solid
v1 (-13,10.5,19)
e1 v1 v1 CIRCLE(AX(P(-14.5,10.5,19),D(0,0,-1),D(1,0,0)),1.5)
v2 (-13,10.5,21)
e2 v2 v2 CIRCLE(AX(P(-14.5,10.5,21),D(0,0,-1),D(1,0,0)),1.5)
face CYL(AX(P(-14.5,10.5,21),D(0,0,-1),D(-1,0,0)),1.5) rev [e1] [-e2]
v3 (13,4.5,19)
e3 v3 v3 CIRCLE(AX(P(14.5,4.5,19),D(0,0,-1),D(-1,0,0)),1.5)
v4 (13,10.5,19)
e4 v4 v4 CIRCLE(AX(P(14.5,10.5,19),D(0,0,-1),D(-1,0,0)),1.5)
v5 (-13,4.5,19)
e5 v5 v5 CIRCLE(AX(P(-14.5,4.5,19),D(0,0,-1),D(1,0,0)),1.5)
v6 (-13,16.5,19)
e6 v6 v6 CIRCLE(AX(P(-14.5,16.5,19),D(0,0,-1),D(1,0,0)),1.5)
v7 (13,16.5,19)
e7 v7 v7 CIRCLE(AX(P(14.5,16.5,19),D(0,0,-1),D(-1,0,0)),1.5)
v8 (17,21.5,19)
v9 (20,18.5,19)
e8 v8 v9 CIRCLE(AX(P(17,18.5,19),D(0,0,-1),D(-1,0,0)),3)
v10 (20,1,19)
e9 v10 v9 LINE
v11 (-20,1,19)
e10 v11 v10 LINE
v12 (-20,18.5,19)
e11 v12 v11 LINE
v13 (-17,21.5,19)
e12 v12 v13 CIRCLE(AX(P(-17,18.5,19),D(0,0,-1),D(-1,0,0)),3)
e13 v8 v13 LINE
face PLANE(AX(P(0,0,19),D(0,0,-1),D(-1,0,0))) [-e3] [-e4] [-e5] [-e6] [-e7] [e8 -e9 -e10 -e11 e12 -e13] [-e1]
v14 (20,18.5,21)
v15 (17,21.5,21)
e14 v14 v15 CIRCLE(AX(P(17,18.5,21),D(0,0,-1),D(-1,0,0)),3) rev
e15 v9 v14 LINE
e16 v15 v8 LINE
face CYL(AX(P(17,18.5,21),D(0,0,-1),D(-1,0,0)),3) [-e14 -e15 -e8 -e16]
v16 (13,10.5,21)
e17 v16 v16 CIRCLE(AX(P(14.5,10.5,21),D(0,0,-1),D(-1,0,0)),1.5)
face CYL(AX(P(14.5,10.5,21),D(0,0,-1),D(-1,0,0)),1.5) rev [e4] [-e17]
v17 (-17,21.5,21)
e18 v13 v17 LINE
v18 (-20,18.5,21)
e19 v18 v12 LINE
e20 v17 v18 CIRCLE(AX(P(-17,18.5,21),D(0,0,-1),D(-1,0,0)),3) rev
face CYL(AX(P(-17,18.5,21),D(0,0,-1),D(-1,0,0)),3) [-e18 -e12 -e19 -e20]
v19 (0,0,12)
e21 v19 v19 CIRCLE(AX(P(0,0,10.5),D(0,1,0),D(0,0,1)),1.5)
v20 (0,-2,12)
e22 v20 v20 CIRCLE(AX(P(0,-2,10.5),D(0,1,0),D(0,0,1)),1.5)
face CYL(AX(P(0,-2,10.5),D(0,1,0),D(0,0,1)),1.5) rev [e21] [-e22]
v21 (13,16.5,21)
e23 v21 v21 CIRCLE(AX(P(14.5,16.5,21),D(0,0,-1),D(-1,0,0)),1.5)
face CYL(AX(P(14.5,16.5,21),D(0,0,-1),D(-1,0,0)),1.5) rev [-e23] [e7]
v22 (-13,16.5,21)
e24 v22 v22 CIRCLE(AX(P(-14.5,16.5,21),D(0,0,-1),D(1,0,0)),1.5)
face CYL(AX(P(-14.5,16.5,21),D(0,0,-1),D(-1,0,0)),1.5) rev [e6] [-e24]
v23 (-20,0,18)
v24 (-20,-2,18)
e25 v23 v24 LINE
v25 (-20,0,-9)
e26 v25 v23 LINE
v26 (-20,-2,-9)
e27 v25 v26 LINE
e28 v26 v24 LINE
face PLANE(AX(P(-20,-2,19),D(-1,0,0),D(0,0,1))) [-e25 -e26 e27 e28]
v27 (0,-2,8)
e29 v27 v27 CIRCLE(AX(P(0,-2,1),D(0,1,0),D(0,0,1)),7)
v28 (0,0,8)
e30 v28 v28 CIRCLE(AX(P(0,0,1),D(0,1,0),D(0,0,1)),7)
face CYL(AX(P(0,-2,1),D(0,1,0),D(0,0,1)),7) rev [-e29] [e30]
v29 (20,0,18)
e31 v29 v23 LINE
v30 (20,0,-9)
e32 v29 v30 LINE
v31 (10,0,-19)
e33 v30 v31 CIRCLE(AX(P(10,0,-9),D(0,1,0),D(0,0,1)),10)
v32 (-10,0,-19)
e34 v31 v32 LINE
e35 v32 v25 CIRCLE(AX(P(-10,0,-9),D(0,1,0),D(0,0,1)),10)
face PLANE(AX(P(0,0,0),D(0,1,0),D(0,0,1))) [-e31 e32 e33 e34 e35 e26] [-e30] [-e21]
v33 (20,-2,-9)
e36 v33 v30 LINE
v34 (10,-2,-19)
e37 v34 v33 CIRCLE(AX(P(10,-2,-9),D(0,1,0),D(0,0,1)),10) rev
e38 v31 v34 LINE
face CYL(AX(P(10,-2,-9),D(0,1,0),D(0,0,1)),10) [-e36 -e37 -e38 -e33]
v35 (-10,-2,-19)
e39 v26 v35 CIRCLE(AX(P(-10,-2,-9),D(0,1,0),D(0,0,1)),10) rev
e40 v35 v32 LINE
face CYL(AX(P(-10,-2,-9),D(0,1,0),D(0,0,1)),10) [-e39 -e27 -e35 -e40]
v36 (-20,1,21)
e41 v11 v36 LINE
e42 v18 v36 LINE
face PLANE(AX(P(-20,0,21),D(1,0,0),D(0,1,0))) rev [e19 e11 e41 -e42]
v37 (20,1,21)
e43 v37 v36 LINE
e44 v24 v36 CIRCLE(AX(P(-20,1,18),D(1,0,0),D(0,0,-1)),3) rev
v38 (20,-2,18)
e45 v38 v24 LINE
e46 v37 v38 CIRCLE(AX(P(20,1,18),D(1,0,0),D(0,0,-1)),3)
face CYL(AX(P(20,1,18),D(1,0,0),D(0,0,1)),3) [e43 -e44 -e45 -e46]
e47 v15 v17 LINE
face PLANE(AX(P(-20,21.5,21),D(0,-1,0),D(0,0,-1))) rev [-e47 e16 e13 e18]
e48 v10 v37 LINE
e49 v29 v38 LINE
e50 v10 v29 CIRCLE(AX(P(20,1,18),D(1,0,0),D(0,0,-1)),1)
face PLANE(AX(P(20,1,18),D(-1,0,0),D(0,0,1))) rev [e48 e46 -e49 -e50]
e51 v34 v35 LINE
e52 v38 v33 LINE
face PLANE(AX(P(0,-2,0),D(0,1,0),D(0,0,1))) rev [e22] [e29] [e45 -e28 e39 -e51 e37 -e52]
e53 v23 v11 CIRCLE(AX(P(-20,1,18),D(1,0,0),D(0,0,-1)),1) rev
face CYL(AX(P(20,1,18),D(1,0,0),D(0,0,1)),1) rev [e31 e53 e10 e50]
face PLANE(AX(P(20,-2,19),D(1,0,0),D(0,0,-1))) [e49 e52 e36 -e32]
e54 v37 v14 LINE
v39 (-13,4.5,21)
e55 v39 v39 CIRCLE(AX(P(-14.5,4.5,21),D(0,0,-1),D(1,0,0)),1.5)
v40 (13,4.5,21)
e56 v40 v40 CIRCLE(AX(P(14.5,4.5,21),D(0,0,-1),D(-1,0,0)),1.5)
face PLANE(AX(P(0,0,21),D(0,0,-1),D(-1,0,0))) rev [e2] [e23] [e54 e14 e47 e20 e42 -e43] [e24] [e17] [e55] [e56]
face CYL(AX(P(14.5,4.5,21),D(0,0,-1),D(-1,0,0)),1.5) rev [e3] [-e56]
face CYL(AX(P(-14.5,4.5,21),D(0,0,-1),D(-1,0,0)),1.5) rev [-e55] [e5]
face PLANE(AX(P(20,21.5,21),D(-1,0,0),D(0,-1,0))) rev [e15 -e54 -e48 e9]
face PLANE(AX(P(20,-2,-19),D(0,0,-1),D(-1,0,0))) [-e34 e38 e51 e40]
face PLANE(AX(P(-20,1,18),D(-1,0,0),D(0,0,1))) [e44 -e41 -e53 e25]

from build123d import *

# Parameters (mm, degrees)
SKETCH1_W                    = 40
SKETCH1_H                    = 38
SKETCH1_R                    = 7
SKETCH1_R_2                  = 1.5
BASE_FLANGE1_DEPTH           = 2
EDGE_FLANGE1_STRIP_W         = 10
EDGE_FLANGE1_STRIP_H         = 2
EDGE_FLANGE1_STRIP_CUT_DEPTH = 40
EDGE_FLANGE1_DEPTH           = 40
FILLET1_R                    = 10
FILLET2_R                    = 3
SKETCH10_R                   = 1.5
CUT_EXTRUDE1_DEPTH           = 49.023431781


# Sheet-metal steps are written as plain solids
with BuildPart() as part:
    # Sketch1 → Base-Flange1 (new body)
    with BuildSketch(Plane(origin=(0, 0, 0), x_dir=(1, 0, 0), z_dir=(0, 1, 0))):
        Rectangle(SKETCH1_W, SKETCH1_H)
        with Locations(Location((0, -1, 0), (0, 0, 270))):
            Circle(SKETCH1_R, mode=Mode.SUBTRACT)
        with Locations(Location((0, -10.5, 0), (0, 0, 270))):
            Circle(SKETCH1_R_2, mode=Mode.SUBTRACT)
    extrude(amount=-BASE_FLANGE1_DEPTH)

    # Edge-Flange1 strip (across the edge) → Edge-Flange1 strip cut (cut)
    with BuildSketch(Plane(origin=(-20, 0, 19), x_dir=(0, 0, -1), z_dir=(1, 0, 0))):
        with Locations((-4, -1)):
            Rectangle(EDGE_FLANGE1_STRIP_W, EDGE_FLANGE1_STRIP_H)
    extrude(amount=EDGE_FLANGE1_STRIP_CUT_DEPTH, mode=Mode.SUBTRACT)

    # Edge-Flange1 section (across the edge) → Edge-Flange1 (add)
    with BuildSketch(Plane(origin=(-20, 0, 19), x_dir=(0, 0, -1), z_dir=(1, 0, 0))):
        with BuildLine():
            Line((-2, 1), (-2, 21.5))
            Line((-2, 21.5), (0, 21.5))
            Line((0, 21.5), (0, 1))
            ThreePointArc((0, 1), (0.292893219, 0.292893219), (1, 0))
            Line((1, 0), (1, -2))
            ThreePointArc((1, -2), (-1.121320344, -1.121320344), (-2, 1))
        make_face()
    extrude(amount=EDGE_FLANGE1_DEPTH)

    # Fillet1
    fillet1_edges = [part.edges().sort_by_distance(p)[0] for p in [
        (-20, -1, -19),
        (20, -1, -19),
    ]]
    fillet(fillet1_edges, radius=FILLET1_R)

    # Fillet2
    fillet2_edges = [part.edges().sort_by_distance(p)[0] for p in [
        (-20, 21.5, 20),
        (20, 21.5, 20),
    ]]
    fillet(fillet2_edges, radius=FILLET2_R)

    # Sketch10 → Cut-Extrude1 (cut, through all)
    with BuildSketch(Plane(origin=(0, 0, 19), x_dir=(-1, 0, 0), z_dir=(0, 0, -1))):
        with Locations((-14.5, 16.5)):
            Circle(SKETCH10_R)
        with Locations((-14.5, 10.5)):
            Circle(SKETCH10_R)
        with Locations((-14.5, 4.5)):
            Circle(SKETCH10_R)
        with Locations(Location((14.5, 4.5, 0), (0, 0, 180))):
            Circle(SKETCH10_R)
        with Locations(Location((14.5, 10.5, 0), (0, 0, 180))):
            Circle(SKETCH10_R)
        with Locations(Location((14.5, 16.5, 0), (0, 0, 180))):
            Circle(SKETCH10_R)
    extrude(amount=-CUT_EXTRUDE1_DEPTH, mode=Mode.SUBTRACT)


solid = part.part
